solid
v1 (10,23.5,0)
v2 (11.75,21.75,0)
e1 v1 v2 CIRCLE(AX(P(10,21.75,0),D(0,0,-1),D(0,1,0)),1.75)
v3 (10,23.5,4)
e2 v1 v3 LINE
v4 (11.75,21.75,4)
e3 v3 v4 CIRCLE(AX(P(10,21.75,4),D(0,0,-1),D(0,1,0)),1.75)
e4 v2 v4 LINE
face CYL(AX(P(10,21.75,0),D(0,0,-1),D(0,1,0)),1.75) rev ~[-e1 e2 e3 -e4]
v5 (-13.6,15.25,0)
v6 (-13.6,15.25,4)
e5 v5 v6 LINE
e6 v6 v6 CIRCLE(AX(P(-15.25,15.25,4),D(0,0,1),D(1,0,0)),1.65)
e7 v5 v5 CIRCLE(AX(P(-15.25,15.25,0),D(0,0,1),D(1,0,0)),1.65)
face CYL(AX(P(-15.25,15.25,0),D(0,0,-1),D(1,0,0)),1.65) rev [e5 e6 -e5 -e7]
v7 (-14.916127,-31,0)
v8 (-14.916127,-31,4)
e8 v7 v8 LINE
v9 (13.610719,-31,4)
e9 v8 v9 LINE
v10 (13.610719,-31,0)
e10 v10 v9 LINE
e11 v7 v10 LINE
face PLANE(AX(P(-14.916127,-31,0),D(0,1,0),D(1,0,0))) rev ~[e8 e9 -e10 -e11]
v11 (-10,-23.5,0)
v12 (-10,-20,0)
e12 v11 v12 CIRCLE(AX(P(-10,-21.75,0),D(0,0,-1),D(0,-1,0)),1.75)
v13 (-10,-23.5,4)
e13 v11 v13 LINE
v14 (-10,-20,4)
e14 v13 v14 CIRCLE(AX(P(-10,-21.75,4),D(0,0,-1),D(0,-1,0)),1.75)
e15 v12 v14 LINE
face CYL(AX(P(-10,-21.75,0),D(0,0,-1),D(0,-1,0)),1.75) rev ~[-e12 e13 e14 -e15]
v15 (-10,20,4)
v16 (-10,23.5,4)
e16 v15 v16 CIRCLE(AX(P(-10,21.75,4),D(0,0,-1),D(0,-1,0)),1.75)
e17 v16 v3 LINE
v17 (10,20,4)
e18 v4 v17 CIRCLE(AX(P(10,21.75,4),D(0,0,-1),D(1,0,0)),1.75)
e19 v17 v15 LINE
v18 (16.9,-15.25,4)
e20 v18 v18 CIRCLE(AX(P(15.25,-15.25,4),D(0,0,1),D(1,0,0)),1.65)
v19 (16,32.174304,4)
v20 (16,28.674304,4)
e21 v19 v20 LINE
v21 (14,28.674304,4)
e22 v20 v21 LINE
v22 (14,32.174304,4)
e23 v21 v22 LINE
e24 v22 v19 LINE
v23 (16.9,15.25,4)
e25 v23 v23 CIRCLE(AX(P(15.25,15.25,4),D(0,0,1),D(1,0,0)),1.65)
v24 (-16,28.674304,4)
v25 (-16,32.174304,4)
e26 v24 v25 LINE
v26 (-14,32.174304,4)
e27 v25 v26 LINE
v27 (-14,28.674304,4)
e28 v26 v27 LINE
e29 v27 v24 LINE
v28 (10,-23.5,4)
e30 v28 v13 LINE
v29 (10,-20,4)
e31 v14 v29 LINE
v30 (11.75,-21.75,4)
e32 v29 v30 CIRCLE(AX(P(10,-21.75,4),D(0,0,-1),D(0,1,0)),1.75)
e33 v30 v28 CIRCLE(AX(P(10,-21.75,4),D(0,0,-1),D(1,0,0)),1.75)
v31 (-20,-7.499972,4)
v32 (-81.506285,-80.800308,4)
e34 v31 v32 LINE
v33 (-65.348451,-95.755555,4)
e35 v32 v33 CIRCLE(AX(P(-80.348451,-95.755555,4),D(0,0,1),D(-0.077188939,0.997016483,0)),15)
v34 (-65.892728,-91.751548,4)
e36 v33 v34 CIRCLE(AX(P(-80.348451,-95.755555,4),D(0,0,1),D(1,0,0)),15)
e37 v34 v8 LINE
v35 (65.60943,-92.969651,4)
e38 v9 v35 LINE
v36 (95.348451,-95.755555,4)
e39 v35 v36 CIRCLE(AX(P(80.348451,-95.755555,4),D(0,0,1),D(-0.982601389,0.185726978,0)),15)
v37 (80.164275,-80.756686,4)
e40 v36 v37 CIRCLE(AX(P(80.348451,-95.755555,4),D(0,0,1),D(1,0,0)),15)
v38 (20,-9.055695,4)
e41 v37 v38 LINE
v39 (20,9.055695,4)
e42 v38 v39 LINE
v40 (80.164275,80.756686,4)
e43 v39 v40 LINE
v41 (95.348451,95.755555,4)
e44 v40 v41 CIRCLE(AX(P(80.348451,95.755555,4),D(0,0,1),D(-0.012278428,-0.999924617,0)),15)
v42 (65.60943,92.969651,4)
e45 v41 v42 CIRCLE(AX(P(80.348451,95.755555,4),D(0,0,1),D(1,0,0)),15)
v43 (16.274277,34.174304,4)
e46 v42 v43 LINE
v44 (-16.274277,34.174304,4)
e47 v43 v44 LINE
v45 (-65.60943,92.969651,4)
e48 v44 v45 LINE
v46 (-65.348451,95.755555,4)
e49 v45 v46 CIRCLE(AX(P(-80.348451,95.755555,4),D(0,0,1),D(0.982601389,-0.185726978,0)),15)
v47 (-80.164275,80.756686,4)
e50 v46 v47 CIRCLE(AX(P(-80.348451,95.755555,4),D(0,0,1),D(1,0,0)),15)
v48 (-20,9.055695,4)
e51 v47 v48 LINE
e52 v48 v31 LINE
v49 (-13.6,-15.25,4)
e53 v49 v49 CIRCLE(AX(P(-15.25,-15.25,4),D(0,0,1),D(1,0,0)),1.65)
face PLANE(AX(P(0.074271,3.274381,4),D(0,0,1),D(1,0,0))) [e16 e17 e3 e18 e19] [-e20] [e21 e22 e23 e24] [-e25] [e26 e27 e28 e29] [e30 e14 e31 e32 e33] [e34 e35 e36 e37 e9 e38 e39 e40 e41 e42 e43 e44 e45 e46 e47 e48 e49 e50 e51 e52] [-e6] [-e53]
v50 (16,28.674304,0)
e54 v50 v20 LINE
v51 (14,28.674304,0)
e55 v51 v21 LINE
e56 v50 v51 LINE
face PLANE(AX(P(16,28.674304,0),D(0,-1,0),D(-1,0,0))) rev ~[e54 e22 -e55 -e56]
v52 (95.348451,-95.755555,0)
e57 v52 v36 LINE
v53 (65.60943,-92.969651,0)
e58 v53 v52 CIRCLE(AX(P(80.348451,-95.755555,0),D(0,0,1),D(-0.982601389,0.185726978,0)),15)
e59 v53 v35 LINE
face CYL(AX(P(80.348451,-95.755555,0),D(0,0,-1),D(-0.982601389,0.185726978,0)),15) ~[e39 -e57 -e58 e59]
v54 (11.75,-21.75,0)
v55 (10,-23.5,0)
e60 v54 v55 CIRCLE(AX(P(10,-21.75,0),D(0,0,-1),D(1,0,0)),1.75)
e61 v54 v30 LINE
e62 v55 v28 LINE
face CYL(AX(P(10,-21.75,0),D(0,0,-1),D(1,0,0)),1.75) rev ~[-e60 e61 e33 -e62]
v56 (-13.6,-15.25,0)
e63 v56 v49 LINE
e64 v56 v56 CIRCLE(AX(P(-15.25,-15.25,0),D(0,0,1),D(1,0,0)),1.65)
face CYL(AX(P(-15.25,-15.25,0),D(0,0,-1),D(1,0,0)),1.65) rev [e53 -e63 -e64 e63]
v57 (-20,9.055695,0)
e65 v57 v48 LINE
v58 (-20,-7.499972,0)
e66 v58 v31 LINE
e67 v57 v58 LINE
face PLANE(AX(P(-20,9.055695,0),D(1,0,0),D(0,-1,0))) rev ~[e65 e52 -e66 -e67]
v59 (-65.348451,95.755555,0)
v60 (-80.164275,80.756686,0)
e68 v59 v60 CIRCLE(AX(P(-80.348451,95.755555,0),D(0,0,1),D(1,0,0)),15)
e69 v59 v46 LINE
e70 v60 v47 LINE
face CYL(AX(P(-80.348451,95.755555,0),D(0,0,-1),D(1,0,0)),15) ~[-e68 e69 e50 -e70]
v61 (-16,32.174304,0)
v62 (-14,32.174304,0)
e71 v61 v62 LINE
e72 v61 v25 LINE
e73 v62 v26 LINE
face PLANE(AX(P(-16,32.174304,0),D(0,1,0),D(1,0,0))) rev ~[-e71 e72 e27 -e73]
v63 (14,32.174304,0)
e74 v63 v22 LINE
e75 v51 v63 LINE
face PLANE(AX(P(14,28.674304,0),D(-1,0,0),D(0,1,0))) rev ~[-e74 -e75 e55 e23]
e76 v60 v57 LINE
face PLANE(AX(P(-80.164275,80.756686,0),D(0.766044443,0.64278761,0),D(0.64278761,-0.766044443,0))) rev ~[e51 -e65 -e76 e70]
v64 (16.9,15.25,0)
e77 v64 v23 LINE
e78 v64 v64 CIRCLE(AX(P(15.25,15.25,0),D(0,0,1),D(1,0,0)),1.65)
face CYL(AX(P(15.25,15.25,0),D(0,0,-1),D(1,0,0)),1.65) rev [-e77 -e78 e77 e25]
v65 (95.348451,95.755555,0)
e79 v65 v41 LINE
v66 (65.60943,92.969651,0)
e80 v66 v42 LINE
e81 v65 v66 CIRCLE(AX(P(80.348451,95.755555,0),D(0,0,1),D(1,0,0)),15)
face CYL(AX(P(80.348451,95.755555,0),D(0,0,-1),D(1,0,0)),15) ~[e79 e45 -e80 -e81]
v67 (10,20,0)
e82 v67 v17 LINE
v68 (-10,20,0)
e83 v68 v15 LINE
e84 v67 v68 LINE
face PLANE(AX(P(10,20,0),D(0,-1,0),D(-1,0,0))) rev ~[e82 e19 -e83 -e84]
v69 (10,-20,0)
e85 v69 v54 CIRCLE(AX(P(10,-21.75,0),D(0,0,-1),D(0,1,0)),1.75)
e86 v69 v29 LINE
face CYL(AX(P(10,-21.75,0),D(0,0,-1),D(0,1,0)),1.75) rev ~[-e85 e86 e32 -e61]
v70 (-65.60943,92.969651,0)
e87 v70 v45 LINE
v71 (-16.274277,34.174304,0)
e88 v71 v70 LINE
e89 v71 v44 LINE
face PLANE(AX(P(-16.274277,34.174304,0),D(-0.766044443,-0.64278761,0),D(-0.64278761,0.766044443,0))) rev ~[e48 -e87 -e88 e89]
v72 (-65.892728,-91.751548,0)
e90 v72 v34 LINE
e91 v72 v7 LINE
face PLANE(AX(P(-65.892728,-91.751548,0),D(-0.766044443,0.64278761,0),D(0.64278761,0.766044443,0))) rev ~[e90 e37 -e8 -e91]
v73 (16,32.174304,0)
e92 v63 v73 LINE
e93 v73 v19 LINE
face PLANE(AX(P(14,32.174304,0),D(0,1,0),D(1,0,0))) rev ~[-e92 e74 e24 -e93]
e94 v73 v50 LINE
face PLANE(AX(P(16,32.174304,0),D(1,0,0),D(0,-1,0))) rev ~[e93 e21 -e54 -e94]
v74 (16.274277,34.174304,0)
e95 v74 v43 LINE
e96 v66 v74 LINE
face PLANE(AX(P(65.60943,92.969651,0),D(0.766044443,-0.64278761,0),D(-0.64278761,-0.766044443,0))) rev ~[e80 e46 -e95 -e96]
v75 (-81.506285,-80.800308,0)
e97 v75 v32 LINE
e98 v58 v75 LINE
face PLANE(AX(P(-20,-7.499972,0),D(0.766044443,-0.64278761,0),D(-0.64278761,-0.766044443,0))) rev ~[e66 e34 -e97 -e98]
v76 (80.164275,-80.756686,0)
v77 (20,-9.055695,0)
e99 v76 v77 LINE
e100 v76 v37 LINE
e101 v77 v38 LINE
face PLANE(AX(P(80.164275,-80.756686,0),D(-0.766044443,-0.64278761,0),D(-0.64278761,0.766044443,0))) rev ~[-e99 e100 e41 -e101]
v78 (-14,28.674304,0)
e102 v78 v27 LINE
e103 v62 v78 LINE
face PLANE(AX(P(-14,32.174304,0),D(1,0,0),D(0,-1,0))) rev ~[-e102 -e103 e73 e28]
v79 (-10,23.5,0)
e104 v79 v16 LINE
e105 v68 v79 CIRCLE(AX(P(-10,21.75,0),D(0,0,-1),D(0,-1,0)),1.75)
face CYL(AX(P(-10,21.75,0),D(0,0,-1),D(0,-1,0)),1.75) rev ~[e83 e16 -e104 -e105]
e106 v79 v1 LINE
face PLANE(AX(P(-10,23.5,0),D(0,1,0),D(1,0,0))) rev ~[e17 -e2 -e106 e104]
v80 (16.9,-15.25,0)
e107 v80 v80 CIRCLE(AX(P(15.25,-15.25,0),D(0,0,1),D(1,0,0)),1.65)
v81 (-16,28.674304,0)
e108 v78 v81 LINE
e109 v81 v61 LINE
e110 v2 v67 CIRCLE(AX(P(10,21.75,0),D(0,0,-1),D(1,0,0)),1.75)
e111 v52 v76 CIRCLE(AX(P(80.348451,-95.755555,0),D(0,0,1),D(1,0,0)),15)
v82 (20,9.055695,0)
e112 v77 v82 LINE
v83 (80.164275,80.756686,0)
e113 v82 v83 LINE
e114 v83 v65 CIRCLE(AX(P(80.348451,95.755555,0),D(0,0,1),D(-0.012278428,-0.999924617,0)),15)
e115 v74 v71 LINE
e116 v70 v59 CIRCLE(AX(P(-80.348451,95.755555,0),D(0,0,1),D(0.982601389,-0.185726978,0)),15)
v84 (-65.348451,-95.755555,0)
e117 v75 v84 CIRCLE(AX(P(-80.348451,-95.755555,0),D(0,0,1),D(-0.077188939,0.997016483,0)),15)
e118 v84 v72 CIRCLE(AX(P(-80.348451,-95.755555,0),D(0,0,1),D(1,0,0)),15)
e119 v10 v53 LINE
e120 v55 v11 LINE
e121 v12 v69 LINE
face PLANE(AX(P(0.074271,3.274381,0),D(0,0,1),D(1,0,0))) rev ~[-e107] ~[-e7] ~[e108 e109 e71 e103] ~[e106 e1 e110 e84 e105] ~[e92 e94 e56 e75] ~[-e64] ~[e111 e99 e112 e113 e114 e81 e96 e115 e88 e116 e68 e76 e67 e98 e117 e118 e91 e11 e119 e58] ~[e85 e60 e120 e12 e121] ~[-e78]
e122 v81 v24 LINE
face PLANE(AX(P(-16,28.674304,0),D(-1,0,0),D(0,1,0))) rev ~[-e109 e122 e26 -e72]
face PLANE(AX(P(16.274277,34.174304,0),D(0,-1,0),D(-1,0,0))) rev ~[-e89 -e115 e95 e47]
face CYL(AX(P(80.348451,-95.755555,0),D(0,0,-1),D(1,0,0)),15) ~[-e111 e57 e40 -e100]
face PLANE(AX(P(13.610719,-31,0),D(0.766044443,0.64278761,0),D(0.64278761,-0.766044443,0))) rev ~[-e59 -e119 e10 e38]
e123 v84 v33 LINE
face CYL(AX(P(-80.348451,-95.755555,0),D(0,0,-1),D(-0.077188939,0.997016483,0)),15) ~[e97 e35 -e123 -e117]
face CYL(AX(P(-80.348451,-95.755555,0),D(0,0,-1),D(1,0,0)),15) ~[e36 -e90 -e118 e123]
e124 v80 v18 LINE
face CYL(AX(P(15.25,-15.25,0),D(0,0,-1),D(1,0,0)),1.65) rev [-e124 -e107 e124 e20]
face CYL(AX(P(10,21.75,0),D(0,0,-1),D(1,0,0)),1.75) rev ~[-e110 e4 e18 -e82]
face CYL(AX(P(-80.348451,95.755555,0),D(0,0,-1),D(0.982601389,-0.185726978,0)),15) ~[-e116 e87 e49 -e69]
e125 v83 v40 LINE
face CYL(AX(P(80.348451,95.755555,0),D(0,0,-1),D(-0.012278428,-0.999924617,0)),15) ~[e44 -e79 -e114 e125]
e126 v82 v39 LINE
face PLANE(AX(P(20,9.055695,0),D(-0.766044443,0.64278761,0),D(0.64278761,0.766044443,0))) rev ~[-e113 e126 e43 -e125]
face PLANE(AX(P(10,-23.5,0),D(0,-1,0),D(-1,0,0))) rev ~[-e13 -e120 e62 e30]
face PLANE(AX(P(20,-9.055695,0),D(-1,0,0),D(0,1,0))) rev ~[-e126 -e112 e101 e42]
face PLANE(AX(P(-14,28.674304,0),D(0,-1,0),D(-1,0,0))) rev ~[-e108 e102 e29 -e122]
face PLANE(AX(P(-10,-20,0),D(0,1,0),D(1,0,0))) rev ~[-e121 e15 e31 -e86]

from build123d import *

# Parameters (mm, degrees)
F0_R     = 1.65
F1_DEPTH = 4


with BuildPart() as f1:
    # F0 (on Top) → F1 (new body)
    with BuildSketch(Plane.XY):
        with BuildLine():
            Line((-20, 34.1743044555), (-20, 20))
            Line((-20, 20), (-20, 9.0556954967))
            Line((-20, 9.0556954967), (-20, -7.4999716698))
            Line((-20, -7.4999716698), (-20, -20))
            Line((-20, -20), (-20, -31))
            Line((-20, -31), (-14.9161266072, -31))
            Line((-14.9161266072, -31), (-8.6228793733, -23.5))
            Line((-8.6228793733, -23.5), (-10, -23.5))
            ThreePointArc((-10, -23.5), (-11.75, -21.75), (-10, -20))
            Line((-10, -20), (-5.6860306642, -20))
            Line((-5.6860306642, -20), (4.3806233749, -20))
            Line((4.3806233749, -20), (10, -20))
            ThreePointArc((10, -20), (11.2374368671, -20.5125631329), (11.75, -21.75))
            ThreePointArc((11.75, -21.75), (11.2374368671, -22.9874368671), (10, -23.5))
            Line((10, -23.5), (7.317472084, -23.5))
            Line((7.317472084, -23.5), (13.6107193178, -31))
            Line((13.6107193178, -31), (20, -31))
            Line((20, -31), (20, -20))
            Line((20, -20), (20, -9.0556954967))
            Line((20, -9.0556954967), (20, 9.0556954967))
            Line((20, 9.0556954967), (20, 20))
            Line((20, 20), (20, 34.1743044555))
            Line((20, 34.1743044555), (16.2742770157, 34.1743044555))
            Line((16.2742770157, 34.1743044555), (14.5960777534, 32.1743044555))
            Line((14.5960777534, 32.1743044555), (16, 32.1743044555))
            Line((16, 32.1743044555), (16, 28.6743044555))
            Line((16, 28.6743044555), (14, 28.6743044555))
            Line((14, 28.6743044555), (14, 31.4639266515))
            Line((14, 31.4639266515), (7.317472084, 23.5))
            Line((7.317472084, 23.5), (10, 23.5))
            ThreePointArc((10, 23.5), (11.2374368671, 22.9874368671), (11.75, 21.75))
            ThreePointArc((11.75, 21.75), (11.2374368671, 20.5125631329), (10, 20))
            Line((10, 20), (0, 20))
            Line((0, 20), (-4.3806233749, 20))
            Line((-4.3806233749, 20), (-10, 20))
            ThreePointArc((-10, 20), (-11.75, 21.75), (-10, 23.5))
            Line((-10, 23.5), (-7.317472084, 23.5))
            Line((-7.317472084, 23.5), (-14, 31.4639266515))
            Line((-14, 31.4639266515), (-14, 28.6743044555))
            Line((-14, 28.6743044555), (-16, 28.6743044555))
            Line((-16, 28.6743044555), (-16, 32.1743044555))
            Line((-16, 32.1743044555), (-14.5960777534, 32.1743044555))
            Line((-14.5960777534, 32.1743044555), (-16.2742770157, 34.1743044555))
            Line((-16.2742770157, 34.1743044555), (-20, 34.1743044555))
        make_face()
        with Locations((-15.25, -15.25)):
            Circle(F0_R, mode=Mode.SUBTRACT)
        with Locations((15.25, -15.25)):
            Circle(F0_R, mode=Mode.SUBTRACT)
        with Locations((-15.25, 15.25)):
            Circle(F0_R, mode=Mode.SUBTRACT)
        with Locations((15.25, 15.25)):
            Circle(F0_R, mode=Mode.SUBTRACT)
        with BuildLine():
            Line((-20, 9.0556954967), (-20, 20))
            Line((-20, 20), (-20, 34.1743044555))
            Line((-20, 34.1743044555), (-16.2742770157, 34.1743044555))
            Line((-16.2742770157, 34.1743044555), (-65.6094303769, 92.9696507149))
            ThreePointArc((-65.6094303769, 92.9696507149), (-70.7066370655, 84.2648887431), (-80.1642747962, 80.7566861309))
            Line((-80.1642747962, 80.7566861309), (-20, 9.0556954967))
        make_face()
        with BuildLine():
            Line((-20, -20), (-20, -7.4999716698))
            Line((-20, -7.4999716698), (-81.5062852996, -80.8003081427))
            ThreePointArc((-81.5062852996, -80.8003081427), (-71.7350386168, -83.4751187737), (-65.8927282585, -91.7515481563))
            Line((-65.8927282585, -91.7515481563), (-14.9161266072, -31))
            Line((-14.9161266072, -31), (-20, -31))
            Line((-20, -31), (-20, -20))
        make_face()
        with BuildLine():
            ThreePointArc((-65.3484512108, 95.7555553899), (-91.0199704611, 106.2968397941), (-80.1642747962, 80.7566861309))
            Line((-80.1642747962, 80.7566861309), (-87.6258734204, 89.6490730979))
            Line((-87.6258734204, 89.6490730979), (-80.3484512108, 95.7555553899))
            Line((-80.3484512108, 95.7555553899), (-73.0710290012, 101.8620376819))
            Line((-73.0710290012, 101.8620376819), (-65.6094303769, 92.9696507149))
            ThreePointArc((-65.6094303769, 92.9696507149), (-65.413838519, 94.3565043737), (-65.3484512108, 95.7555553899))
        make_face()
        with BuildLine():
            Line((-87.6258734204, 89.6490730979), (-80.1642747962, 80.7566861309))
            ThreePointArc((-80.1642747962, 80.7566861309), (-70.7066370655, 84.2648887431), (-65.6094303769, 92.9696507149))
            Line((-65.6094303769, 92.9696507149), (-73.0710290012, 101.8620376819))
            Line((-73.0710290012, 101.8620376819), (-80.3484512108, 95.7555553899))
            Line((-80.3484512108, 95.7555553899), (-87.6258734204, 89.6490730979))
        make_face()
        Polygon((16.2742770157, 34.1743044555), (-16.2742770157, 34.1743044555), (-14.5960777534, 32.1743044555), (-14, 32.1743044555), (-14, 31.4639266515), (-7.317472084, 23.5), (7.317472084, 23.5), (14, 31.4639266515), (14, 32.1743044555), (14.5960777534, 32.1743044555), align=None)
        with BuildLine():
            ThreePointArc((-65.8927282585, -91.7515481563), (-71.7350386168, -83.4751187737), (-81.5062852996, -80.8003081427))
            Line((-81.5062852996, -80.8003081427), (-88.3919178636, -89.0062854882))
            Line((-88.3919178636, -89.0062854882), (-80.3484512108, -95.7555553899))
            Line((-80.3484512108, -95.7555553899), (-73.8370734443, -101.2192500722))
            Line((-73.8370734443, -101.2192500722), (-65.8927282585, -91.7515481563))
        make_face()
        with BuildLine():
            Line((-88.3919178636, -89.0062854882), (-81.5062852996, -80.8003081427))
            ThreePointArc((-81.5062852996, -80.8003081427), (-90.5374768921, -106.7639047514), (-65.3484512108, -95.7555553899))
            ThreePointArc((-65.3484512108, -95.7555553899), (-65.485143297, -93.7351401212), (-65.8927282585, -91.7515481563))
            Line((-65.8927282585, -91.7515481563), (-73.8370734443, -101.2192500722))
            Line((-73.8370734443, -101.2192500722), (-80.3484512108, -95.7555553899))
            Line((-80.3484512108, -95.7555553899), (-88.3919178636, -89.0062854882))
        make_face()
        with BuildLine():
            Line((65.6094303769, 92.9696507149), (16.2742770157, 34.1743044555))
            Line((16.2742770157, 34.1743044555), (20, 34.1743044555))
            Line((20, 34.1743044555), (20, 20))
            Line((20, 20), (20, 9.0556954967))
            Line((20, 9.0556954967), (80.1642747962, 80.7566861309))
            ThreePointArc((80.1642747962, 80.7566861309), (70.7066370655, 84.2648887431), (65.6094303769, 92.9696507149))
        make_face()
        with BuildLine():
            ThreePointArc((95.3484512108, 95.7555553899), (78.9494001947, 110.6901680817), (65.6094303769, 92.9696507149))
            Line((65.6094303769, 92.9696507149), (73.0710290012, 101.8620376819))
            Line((73.0710290012, 101.8620376819), (80.3484512108, 95.7555553899))
            Line((80.3484512108, 95.7555553899), (87.6258734204, 89.6490730979))
            Line((87.6258734204, 89.6490730979), (80.1642747962, 80.7566861309))
            ThreePointArc((80.1642747962, 80.7566861309), (90.889735615, 85.0840361396), (95.3484512108, 95.7555553899))
        make_face()
        with BuildLine():
            Line((73.0710290012, 101.8620376819), (65.6094303769, 92.9696507149))
            ThreePointArc((65.6094303769, 92.9696507149), (70.7066370655, 84.2648887431), (80.1642747962, 80.7566861309))
            Line((80.1642747962, 80.7566861309), (87.6258734204, 89.6490730979))
            Line((87.6258734204, 89.6490730979), (80.3484512108, 95.7555553899))
            Line((80.3484512108, 95.7555553899), (73.0710290012, 101.8620376819))
        make_face()
        Polygon((-8.6228793733, -23.5), (-14.9161266072, -31), (13.6107193178, -31), (7.317472084, -23.5), align=None)
        with BuildLine():
            Line((20, -31), (13.6107193178, -31))
            Line((13.6107193178, -31), (65.6094303769, -92.9696507149))
            ThreePointArc((65.6094303769, -92.9696507149), (70.7066370655, -84.2648887431), (80.1642747962, -80.7566861309))
            Line((80.1642747962, -80.7566861309), (20, -9.0556954967))
            Line((20, -9.0556954967), (20, -20))
            Line((20, -20), (20, -31))
        make_face()
        with BuildLine():
            ThreePointArc((80.1642747962, -80.7566861309), (70.7066370655, -84.2648887431), (65.6094303769, -92.9696507149))
            Line((65.6094303769, -92.9696507149), (73.0710290012, -101.8620376819))
            Line((73.0710290012, -101.8620376819), (80.3484512108, -95.7555553899))
            Line((80.3484512108, -95.7555553899), (87.6258734204, -89.6490730979))
            Line((87.6258734204, -89.6490730979), (80.1642747962, -80.7566861309))
        make_face()
        with BuildLine():
            Line((73.0710290012, -101.8620376819), (65.6094303769, -92.9696507149))
            ThreePointArc((65.6094303769, -92.9696507149), (78.9494001947, -110.6901680817), (95.3484512108, -95.7555553899))
            ThreePointArc((95.3484512108, -95.7555553899), (90.889735615, -85.0840361396), (80.1642747962, -80.7566861309))
            Line((80.1642747962, -80.7566861309), (87.6258734204, -89.6490730979))
            Line((87.6258734204, -89.6490730979), (80.3484512108, -95.7555553899))
            Line((80.3484512108, -95.7555553899), (73.0710290012, -101.8620376819))
        make_face()
    extrude(amount=F1_DEPTH)


solid = f1.part
